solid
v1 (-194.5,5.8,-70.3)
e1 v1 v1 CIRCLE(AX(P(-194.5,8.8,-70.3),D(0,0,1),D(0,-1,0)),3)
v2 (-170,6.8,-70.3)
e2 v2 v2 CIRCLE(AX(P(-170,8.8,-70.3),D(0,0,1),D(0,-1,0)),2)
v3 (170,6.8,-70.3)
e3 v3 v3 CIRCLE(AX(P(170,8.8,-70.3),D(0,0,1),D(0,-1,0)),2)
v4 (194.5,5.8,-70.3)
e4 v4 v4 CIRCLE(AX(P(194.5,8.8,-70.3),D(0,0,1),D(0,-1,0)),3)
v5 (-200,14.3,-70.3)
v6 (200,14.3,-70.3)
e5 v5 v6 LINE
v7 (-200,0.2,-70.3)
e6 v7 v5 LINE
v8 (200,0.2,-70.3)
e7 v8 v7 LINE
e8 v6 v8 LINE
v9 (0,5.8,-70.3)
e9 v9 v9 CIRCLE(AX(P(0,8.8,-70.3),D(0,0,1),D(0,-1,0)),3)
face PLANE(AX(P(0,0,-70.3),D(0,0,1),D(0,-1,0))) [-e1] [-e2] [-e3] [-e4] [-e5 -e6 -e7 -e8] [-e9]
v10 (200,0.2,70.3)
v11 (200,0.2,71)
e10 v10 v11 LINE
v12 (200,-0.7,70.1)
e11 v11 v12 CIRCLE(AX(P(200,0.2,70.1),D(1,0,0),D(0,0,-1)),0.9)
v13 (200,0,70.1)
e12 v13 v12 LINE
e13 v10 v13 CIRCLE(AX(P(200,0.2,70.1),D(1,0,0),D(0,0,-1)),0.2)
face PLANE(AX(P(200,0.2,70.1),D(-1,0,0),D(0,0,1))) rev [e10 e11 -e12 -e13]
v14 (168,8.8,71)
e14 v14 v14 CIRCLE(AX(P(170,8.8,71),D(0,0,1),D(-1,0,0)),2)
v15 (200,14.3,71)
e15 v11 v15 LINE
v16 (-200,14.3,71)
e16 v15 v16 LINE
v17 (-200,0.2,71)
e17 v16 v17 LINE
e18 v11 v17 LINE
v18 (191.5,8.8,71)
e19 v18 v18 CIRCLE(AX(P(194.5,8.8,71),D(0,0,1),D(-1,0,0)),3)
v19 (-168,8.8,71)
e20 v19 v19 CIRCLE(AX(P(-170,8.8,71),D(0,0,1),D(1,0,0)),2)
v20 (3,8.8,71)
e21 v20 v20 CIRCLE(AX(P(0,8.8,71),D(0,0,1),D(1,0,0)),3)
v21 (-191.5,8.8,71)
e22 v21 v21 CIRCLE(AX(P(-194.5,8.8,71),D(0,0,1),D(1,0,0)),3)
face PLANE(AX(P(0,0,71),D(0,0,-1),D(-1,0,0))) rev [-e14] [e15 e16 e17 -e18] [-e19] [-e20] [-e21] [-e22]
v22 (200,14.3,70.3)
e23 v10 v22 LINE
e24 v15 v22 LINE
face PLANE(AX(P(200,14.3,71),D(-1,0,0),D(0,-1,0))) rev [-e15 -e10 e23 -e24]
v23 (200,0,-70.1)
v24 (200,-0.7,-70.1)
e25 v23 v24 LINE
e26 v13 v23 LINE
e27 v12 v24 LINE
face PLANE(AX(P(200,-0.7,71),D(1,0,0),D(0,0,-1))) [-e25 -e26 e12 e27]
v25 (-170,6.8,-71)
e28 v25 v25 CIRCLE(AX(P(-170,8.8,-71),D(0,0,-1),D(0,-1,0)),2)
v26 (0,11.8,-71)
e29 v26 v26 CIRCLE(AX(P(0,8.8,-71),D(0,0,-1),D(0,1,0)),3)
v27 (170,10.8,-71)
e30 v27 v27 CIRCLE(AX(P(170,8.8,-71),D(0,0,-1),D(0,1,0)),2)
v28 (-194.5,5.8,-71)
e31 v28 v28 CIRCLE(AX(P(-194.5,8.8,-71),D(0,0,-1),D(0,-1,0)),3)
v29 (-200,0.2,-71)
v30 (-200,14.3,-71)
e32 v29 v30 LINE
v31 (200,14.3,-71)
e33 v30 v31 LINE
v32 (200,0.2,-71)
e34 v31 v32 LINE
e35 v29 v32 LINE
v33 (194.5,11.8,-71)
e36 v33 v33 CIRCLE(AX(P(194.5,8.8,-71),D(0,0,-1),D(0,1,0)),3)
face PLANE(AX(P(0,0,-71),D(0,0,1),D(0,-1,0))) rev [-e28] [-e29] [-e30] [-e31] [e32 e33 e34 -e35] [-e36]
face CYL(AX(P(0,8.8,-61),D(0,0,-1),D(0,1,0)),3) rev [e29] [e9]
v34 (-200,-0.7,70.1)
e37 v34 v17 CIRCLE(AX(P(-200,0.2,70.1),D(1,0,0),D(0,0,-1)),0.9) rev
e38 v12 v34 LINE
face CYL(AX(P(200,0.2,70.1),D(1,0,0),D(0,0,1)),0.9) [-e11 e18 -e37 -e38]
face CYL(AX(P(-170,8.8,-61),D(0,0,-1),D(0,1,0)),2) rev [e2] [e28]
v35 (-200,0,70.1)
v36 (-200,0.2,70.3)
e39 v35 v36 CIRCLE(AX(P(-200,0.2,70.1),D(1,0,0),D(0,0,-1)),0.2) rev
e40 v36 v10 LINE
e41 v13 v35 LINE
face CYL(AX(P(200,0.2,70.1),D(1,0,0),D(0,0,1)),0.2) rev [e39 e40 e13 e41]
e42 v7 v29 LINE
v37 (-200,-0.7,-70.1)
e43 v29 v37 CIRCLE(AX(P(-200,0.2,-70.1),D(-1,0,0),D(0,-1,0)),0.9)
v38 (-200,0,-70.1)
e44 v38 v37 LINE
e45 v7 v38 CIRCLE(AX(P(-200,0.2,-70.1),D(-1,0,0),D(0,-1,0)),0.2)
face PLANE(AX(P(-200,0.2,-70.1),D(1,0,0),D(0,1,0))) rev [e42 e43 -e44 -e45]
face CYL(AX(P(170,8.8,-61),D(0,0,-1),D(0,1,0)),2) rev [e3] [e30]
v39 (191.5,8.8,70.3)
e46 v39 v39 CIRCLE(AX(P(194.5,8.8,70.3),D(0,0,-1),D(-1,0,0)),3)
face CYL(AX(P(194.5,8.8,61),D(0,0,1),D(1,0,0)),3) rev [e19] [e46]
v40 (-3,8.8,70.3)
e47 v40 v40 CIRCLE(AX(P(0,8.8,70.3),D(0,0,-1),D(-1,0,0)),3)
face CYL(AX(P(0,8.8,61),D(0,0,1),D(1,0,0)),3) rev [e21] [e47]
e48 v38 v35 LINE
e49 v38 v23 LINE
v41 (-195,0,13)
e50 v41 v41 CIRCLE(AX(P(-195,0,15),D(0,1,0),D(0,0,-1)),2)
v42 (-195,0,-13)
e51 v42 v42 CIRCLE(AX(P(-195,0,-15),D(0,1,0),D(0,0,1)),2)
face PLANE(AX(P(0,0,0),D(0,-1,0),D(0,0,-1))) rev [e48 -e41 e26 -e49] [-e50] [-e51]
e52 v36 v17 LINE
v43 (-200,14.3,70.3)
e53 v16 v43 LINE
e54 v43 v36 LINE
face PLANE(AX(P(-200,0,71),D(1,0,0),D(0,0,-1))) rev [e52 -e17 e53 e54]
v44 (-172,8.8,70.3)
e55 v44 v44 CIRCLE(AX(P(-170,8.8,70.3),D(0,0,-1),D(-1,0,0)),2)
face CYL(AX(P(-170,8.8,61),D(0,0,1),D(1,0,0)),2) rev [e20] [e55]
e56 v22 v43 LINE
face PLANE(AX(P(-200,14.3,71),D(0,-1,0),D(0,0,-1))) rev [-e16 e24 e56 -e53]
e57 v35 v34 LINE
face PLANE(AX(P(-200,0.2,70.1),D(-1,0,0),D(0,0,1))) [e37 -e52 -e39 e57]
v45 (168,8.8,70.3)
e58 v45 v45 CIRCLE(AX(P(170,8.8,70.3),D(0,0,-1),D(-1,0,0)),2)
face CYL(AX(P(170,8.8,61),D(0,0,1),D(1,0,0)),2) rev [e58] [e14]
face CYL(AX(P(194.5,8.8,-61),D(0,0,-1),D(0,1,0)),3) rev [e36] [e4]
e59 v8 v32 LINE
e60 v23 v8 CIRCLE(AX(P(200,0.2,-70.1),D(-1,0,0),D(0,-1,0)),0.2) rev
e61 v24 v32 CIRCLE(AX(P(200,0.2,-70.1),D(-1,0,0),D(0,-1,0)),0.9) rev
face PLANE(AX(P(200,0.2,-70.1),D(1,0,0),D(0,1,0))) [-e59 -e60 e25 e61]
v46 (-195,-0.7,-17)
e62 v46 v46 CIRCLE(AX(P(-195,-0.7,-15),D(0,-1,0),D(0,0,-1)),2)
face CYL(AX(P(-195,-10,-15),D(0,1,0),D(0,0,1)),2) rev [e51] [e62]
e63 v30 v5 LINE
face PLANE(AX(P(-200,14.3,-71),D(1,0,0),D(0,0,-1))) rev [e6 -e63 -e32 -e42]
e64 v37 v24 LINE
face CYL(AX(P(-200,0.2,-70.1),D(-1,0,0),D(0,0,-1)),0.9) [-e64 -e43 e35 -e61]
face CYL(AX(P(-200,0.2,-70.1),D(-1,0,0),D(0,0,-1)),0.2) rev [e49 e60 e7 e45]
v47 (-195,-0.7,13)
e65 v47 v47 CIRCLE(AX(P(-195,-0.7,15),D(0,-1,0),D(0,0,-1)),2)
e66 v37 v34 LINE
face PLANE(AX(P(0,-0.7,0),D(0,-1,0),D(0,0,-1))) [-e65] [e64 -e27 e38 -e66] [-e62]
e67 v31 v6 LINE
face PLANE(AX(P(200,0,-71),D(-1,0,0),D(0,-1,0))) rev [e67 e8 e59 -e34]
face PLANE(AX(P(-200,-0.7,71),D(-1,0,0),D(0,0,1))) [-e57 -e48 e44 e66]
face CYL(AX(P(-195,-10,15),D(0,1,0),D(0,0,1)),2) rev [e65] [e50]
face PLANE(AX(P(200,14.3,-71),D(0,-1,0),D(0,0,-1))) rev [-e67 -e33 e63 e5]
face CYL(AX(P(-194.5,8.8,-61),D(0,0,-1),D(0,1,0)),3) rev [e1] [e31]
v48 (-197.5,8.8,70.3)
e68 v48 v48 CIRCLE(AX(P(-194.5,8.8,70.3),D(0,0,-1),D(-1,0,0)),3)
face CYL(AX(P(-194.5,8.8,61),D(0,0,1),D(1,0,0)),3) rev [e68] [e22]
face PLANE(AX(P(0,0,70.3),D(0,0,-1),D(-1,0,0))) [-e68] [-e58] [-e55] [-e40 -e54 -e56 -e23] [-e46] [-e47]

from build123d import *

# Parameters (mm, degrees)
SKETCH_1_W                         = 400
SKETCH_1_H                         = 142
SM_BASE_FLANGE_1_DEPTH             = 0.7
SM_EDGE_FLANGE_1_STRIP_W           = 3.2
SM_EDGE_FLANGE_1_STRIP_H           = 0.7
SM_EDGE_FLANGE_1_STRIP_CUT_DEPTH   = 400
SM_EDGE_FLANGE_1_STRIP_2_W         = 3.2
SM_EDGE_FLANGE_1_STRIP_2_H         = 0.7
SM_EDGE_FLANGE_1_STRIP_CUT_2_DEPTH = 400
SM_EDGE_FLANGE_1_DEPTH             = 400
SM_EDGE_FLANGE_1_BEND_DEPTH        = 400
SKETCH_17_R                        = 3
CUT_EXTRUDE_1_DEPTH                = 10
CUT_EXTRUDE_START                  = -10
SKETCH_18_R                        = 3
CUT_EXTRUDE_2_DEPTH                = 10
SKETCH_19_R                        = 2
CUT_EXTRUDE_3_DEPTH                = 10
SKETCH_20_R                        = 2
CUT_EXTRUDE_4_DEPTH                = 10
SKETCH_21_R                        = 2
CUT_EXTRUDE_5_DEPTH                = 10


# Sheet-metal steps are written as plain solids
with BuildPart() as part:
    # 草图1 → 基体-法兰1 (new body)
    with BuildSketch(Plane(origin=(0, 0, 0), x_dir=(1, 0, 0), z_dir=(0, 1, 0))):
        Rectangle(SKETCH_1_W, SKETCH_1_H)
    extrude(amount=-SM_BASE_FLANGE_1_DEPTH)

    # 边线-法兰1 strip (across the edge) → 边线-法兰1 strip cut (cut)
    with BuildSketch(Plane(origin=(200, 0, -71), x_dir=(0, 0, 1), z_dir=(-1, 0, 0))):
        with Locations((-0.7, -0.35)):
            Rectangle(SM_EDGE_FLANGE_1_STRIP_W, SM_EDGE_FLANGE_1_STRIP_H)
    extrude(amount=SM_EDGE_FLANGE_1_STRIP_CUT_DEPTH, mode=Mode.SUBTRACT)

    # 边线-法兰1 strip 2 (across the edge) → 边线-法兰1 strip cut 2 (cut)
    with BuildSketch(Plane(origin=(-200, 0, 71), x_dir=(0, 0, -1), z_dir=(1, 0, 0))):
        with Locations((-0.7, -0.35)):
            Rectangle(SM_EDGE_FLANGE_1_STRIP_2_W, SM_EDGE_FLANGE_1_STRIP_2_H)
    extrude(amount=SM_EDGE_FLANGE_1_STRIP_CUT_2_DEPTH, mode=Mode.SUBTRACT)

    # 边线-法兰1 section (across the edge) → 边线-法兰1 (add)
    with BuildSketch(Plane(origin=(200, 0, -71), x_dir=(0, 0, 1), z_dir=(-1, 0, 0))):
        with BuildLine():
            Line((0, 0.2), (0, 14.3))
            Line((0, 14.3), (0.7, 14.3))
            Line((0.7, 14.3), (0.7, 0.2))
            ThreePointArc((0.7, 0.2), (0.758578644, 0.058578644), (0.9, 0))
            Line((0.9, 0), (0.9, -0.7))
            ThreePointArc((0.9, -0.7), (0.263603897, -0.436396103), (0, 0.2))
        make_face()
    extrude(amount=SM_EDGE_FLANGE_1_DEPTH)

    # 边线-法兰1 section 2 (across the edge) → 边线-法兰1 bend (add)
    with BuildSketch(Plane(origin=(-200, 0, 71), x_dir=(0, 0, -1), z_dir=(1, 0, 0))):
        with BuildLine():
            Line((0, 0.2), (0, 14.3))
            Line((0, 14.3), (0.7, 14.3))
            Line((0.7, 14.3), (0.7, 0.2))
            ThreePointArc((0.7, 0.2), (0.758578644, 0.058578644), (0.9, 0))
            Line((0.9, 0), (0.9, -0.7))
            ThreePointArc((0.9, -0.7), (0.263603897, -0.436396103), (0, 0.2))
        make_face()
    extrude(amount=SM_EDGE_FLANGE_1_BEND_DEPTH)

    # 草图17 → 切除-拉伸1 (cut)
    with BuildSketch(Plane(origin=(0, 0, -71), x_dir=(-1, 0, 0), z_dir=(0, 0, -1))):
        with Locations(Location((-194.5, 8.8, 0), (0, 0, 90))):
            Circle(SKETCH_17_R)
        with Locations(Location((0, 8.8, 0), (0, 0, 90))):
            Circle(SKETCH_17_R)
        with Locations(Location((194.5, 8.8, 0), (0, 0, 270))):
            Circle(SKETCH_17_R)
    extrude(amount=-CUT_EXTRUDE_1_DEPTH, mode=Mode.SUBTRACT)

    # 草图18 → 切除-拉伸2 (cut)
    with BuildSketch(Plane.XY.offset(71).offset(CUT_EXTRUDE_START)):
        with Locations(Location((-194.5, 8.8, 0), (0, 0, 270))):
            Circle(SKETCH_18_R)
        with Locations(Location((0, 8.8, 0), (0, 0, 90))):
            Circle(SKETCH_18_R)
        with Locations(Location((194.5, 8.8, 0), (0, 0, 90))):
            Circle(SKETCH_18_R)
    extrude(amount=CUT_EXTRUDE_2_DEPTH, mode=Mode.SUBTRACT)

    # 草图19 → 切除-拉伸3 (cut)
    with BuildSketch(Plane(origin=(0, 0, -71), x_dir=(-1, 0, 0), z_dir=(0, 0, -1))):
        with Locations(Location((-170, 8.8, 0), (0, 0, 90))):
            Circle(SKETCH_19_R)
        with Locations(Location((170, 8.8, 0), (0, 0, 270))):
            Circle(SKETCH_19_R)
    extrude(amount=-CUT_EXTRUDE_3_DEPTH, mode=Mode.SUBTRACT)

    # 草图20 → 切除-拉伸4 (cut)
    with BuildSketch(Plane.XY.offset(71).offset(CUT_EXTRUDE_START)):
        with Locations(Location((-170, 8.8, 0), (0, 0, 270))):
            Circle(SKETCH_20_R)
        with Locations(Location((170, 8.8, 0), (0, 0, 90))):
            Circle(SKETCH_20_R)
    extrude(amount=CUT_EXTRUDE_4_DEPTH, mode=Mode.SUBTRACT)

    # 草图21 → 切除-拉伸5 (cut)
    with BuildSketch(Plane(origin=(0, 0, 0), x_dir=(1, 0, 0), z_dir=(0, 1, 0))):
        with Locations(Location((-195, 15, 0), (0, 0, 270))):
            Circle(SKETCH_21_R)
        with Locations(Location((-195, -15, 0), (0, 0, 90))):
            Circle(SKETCH_21_R)
    extrude(amount=-CUT_EXTRUDE_5_DEPTH, mode=Mode.SUBTRACT)


solid = part.part
